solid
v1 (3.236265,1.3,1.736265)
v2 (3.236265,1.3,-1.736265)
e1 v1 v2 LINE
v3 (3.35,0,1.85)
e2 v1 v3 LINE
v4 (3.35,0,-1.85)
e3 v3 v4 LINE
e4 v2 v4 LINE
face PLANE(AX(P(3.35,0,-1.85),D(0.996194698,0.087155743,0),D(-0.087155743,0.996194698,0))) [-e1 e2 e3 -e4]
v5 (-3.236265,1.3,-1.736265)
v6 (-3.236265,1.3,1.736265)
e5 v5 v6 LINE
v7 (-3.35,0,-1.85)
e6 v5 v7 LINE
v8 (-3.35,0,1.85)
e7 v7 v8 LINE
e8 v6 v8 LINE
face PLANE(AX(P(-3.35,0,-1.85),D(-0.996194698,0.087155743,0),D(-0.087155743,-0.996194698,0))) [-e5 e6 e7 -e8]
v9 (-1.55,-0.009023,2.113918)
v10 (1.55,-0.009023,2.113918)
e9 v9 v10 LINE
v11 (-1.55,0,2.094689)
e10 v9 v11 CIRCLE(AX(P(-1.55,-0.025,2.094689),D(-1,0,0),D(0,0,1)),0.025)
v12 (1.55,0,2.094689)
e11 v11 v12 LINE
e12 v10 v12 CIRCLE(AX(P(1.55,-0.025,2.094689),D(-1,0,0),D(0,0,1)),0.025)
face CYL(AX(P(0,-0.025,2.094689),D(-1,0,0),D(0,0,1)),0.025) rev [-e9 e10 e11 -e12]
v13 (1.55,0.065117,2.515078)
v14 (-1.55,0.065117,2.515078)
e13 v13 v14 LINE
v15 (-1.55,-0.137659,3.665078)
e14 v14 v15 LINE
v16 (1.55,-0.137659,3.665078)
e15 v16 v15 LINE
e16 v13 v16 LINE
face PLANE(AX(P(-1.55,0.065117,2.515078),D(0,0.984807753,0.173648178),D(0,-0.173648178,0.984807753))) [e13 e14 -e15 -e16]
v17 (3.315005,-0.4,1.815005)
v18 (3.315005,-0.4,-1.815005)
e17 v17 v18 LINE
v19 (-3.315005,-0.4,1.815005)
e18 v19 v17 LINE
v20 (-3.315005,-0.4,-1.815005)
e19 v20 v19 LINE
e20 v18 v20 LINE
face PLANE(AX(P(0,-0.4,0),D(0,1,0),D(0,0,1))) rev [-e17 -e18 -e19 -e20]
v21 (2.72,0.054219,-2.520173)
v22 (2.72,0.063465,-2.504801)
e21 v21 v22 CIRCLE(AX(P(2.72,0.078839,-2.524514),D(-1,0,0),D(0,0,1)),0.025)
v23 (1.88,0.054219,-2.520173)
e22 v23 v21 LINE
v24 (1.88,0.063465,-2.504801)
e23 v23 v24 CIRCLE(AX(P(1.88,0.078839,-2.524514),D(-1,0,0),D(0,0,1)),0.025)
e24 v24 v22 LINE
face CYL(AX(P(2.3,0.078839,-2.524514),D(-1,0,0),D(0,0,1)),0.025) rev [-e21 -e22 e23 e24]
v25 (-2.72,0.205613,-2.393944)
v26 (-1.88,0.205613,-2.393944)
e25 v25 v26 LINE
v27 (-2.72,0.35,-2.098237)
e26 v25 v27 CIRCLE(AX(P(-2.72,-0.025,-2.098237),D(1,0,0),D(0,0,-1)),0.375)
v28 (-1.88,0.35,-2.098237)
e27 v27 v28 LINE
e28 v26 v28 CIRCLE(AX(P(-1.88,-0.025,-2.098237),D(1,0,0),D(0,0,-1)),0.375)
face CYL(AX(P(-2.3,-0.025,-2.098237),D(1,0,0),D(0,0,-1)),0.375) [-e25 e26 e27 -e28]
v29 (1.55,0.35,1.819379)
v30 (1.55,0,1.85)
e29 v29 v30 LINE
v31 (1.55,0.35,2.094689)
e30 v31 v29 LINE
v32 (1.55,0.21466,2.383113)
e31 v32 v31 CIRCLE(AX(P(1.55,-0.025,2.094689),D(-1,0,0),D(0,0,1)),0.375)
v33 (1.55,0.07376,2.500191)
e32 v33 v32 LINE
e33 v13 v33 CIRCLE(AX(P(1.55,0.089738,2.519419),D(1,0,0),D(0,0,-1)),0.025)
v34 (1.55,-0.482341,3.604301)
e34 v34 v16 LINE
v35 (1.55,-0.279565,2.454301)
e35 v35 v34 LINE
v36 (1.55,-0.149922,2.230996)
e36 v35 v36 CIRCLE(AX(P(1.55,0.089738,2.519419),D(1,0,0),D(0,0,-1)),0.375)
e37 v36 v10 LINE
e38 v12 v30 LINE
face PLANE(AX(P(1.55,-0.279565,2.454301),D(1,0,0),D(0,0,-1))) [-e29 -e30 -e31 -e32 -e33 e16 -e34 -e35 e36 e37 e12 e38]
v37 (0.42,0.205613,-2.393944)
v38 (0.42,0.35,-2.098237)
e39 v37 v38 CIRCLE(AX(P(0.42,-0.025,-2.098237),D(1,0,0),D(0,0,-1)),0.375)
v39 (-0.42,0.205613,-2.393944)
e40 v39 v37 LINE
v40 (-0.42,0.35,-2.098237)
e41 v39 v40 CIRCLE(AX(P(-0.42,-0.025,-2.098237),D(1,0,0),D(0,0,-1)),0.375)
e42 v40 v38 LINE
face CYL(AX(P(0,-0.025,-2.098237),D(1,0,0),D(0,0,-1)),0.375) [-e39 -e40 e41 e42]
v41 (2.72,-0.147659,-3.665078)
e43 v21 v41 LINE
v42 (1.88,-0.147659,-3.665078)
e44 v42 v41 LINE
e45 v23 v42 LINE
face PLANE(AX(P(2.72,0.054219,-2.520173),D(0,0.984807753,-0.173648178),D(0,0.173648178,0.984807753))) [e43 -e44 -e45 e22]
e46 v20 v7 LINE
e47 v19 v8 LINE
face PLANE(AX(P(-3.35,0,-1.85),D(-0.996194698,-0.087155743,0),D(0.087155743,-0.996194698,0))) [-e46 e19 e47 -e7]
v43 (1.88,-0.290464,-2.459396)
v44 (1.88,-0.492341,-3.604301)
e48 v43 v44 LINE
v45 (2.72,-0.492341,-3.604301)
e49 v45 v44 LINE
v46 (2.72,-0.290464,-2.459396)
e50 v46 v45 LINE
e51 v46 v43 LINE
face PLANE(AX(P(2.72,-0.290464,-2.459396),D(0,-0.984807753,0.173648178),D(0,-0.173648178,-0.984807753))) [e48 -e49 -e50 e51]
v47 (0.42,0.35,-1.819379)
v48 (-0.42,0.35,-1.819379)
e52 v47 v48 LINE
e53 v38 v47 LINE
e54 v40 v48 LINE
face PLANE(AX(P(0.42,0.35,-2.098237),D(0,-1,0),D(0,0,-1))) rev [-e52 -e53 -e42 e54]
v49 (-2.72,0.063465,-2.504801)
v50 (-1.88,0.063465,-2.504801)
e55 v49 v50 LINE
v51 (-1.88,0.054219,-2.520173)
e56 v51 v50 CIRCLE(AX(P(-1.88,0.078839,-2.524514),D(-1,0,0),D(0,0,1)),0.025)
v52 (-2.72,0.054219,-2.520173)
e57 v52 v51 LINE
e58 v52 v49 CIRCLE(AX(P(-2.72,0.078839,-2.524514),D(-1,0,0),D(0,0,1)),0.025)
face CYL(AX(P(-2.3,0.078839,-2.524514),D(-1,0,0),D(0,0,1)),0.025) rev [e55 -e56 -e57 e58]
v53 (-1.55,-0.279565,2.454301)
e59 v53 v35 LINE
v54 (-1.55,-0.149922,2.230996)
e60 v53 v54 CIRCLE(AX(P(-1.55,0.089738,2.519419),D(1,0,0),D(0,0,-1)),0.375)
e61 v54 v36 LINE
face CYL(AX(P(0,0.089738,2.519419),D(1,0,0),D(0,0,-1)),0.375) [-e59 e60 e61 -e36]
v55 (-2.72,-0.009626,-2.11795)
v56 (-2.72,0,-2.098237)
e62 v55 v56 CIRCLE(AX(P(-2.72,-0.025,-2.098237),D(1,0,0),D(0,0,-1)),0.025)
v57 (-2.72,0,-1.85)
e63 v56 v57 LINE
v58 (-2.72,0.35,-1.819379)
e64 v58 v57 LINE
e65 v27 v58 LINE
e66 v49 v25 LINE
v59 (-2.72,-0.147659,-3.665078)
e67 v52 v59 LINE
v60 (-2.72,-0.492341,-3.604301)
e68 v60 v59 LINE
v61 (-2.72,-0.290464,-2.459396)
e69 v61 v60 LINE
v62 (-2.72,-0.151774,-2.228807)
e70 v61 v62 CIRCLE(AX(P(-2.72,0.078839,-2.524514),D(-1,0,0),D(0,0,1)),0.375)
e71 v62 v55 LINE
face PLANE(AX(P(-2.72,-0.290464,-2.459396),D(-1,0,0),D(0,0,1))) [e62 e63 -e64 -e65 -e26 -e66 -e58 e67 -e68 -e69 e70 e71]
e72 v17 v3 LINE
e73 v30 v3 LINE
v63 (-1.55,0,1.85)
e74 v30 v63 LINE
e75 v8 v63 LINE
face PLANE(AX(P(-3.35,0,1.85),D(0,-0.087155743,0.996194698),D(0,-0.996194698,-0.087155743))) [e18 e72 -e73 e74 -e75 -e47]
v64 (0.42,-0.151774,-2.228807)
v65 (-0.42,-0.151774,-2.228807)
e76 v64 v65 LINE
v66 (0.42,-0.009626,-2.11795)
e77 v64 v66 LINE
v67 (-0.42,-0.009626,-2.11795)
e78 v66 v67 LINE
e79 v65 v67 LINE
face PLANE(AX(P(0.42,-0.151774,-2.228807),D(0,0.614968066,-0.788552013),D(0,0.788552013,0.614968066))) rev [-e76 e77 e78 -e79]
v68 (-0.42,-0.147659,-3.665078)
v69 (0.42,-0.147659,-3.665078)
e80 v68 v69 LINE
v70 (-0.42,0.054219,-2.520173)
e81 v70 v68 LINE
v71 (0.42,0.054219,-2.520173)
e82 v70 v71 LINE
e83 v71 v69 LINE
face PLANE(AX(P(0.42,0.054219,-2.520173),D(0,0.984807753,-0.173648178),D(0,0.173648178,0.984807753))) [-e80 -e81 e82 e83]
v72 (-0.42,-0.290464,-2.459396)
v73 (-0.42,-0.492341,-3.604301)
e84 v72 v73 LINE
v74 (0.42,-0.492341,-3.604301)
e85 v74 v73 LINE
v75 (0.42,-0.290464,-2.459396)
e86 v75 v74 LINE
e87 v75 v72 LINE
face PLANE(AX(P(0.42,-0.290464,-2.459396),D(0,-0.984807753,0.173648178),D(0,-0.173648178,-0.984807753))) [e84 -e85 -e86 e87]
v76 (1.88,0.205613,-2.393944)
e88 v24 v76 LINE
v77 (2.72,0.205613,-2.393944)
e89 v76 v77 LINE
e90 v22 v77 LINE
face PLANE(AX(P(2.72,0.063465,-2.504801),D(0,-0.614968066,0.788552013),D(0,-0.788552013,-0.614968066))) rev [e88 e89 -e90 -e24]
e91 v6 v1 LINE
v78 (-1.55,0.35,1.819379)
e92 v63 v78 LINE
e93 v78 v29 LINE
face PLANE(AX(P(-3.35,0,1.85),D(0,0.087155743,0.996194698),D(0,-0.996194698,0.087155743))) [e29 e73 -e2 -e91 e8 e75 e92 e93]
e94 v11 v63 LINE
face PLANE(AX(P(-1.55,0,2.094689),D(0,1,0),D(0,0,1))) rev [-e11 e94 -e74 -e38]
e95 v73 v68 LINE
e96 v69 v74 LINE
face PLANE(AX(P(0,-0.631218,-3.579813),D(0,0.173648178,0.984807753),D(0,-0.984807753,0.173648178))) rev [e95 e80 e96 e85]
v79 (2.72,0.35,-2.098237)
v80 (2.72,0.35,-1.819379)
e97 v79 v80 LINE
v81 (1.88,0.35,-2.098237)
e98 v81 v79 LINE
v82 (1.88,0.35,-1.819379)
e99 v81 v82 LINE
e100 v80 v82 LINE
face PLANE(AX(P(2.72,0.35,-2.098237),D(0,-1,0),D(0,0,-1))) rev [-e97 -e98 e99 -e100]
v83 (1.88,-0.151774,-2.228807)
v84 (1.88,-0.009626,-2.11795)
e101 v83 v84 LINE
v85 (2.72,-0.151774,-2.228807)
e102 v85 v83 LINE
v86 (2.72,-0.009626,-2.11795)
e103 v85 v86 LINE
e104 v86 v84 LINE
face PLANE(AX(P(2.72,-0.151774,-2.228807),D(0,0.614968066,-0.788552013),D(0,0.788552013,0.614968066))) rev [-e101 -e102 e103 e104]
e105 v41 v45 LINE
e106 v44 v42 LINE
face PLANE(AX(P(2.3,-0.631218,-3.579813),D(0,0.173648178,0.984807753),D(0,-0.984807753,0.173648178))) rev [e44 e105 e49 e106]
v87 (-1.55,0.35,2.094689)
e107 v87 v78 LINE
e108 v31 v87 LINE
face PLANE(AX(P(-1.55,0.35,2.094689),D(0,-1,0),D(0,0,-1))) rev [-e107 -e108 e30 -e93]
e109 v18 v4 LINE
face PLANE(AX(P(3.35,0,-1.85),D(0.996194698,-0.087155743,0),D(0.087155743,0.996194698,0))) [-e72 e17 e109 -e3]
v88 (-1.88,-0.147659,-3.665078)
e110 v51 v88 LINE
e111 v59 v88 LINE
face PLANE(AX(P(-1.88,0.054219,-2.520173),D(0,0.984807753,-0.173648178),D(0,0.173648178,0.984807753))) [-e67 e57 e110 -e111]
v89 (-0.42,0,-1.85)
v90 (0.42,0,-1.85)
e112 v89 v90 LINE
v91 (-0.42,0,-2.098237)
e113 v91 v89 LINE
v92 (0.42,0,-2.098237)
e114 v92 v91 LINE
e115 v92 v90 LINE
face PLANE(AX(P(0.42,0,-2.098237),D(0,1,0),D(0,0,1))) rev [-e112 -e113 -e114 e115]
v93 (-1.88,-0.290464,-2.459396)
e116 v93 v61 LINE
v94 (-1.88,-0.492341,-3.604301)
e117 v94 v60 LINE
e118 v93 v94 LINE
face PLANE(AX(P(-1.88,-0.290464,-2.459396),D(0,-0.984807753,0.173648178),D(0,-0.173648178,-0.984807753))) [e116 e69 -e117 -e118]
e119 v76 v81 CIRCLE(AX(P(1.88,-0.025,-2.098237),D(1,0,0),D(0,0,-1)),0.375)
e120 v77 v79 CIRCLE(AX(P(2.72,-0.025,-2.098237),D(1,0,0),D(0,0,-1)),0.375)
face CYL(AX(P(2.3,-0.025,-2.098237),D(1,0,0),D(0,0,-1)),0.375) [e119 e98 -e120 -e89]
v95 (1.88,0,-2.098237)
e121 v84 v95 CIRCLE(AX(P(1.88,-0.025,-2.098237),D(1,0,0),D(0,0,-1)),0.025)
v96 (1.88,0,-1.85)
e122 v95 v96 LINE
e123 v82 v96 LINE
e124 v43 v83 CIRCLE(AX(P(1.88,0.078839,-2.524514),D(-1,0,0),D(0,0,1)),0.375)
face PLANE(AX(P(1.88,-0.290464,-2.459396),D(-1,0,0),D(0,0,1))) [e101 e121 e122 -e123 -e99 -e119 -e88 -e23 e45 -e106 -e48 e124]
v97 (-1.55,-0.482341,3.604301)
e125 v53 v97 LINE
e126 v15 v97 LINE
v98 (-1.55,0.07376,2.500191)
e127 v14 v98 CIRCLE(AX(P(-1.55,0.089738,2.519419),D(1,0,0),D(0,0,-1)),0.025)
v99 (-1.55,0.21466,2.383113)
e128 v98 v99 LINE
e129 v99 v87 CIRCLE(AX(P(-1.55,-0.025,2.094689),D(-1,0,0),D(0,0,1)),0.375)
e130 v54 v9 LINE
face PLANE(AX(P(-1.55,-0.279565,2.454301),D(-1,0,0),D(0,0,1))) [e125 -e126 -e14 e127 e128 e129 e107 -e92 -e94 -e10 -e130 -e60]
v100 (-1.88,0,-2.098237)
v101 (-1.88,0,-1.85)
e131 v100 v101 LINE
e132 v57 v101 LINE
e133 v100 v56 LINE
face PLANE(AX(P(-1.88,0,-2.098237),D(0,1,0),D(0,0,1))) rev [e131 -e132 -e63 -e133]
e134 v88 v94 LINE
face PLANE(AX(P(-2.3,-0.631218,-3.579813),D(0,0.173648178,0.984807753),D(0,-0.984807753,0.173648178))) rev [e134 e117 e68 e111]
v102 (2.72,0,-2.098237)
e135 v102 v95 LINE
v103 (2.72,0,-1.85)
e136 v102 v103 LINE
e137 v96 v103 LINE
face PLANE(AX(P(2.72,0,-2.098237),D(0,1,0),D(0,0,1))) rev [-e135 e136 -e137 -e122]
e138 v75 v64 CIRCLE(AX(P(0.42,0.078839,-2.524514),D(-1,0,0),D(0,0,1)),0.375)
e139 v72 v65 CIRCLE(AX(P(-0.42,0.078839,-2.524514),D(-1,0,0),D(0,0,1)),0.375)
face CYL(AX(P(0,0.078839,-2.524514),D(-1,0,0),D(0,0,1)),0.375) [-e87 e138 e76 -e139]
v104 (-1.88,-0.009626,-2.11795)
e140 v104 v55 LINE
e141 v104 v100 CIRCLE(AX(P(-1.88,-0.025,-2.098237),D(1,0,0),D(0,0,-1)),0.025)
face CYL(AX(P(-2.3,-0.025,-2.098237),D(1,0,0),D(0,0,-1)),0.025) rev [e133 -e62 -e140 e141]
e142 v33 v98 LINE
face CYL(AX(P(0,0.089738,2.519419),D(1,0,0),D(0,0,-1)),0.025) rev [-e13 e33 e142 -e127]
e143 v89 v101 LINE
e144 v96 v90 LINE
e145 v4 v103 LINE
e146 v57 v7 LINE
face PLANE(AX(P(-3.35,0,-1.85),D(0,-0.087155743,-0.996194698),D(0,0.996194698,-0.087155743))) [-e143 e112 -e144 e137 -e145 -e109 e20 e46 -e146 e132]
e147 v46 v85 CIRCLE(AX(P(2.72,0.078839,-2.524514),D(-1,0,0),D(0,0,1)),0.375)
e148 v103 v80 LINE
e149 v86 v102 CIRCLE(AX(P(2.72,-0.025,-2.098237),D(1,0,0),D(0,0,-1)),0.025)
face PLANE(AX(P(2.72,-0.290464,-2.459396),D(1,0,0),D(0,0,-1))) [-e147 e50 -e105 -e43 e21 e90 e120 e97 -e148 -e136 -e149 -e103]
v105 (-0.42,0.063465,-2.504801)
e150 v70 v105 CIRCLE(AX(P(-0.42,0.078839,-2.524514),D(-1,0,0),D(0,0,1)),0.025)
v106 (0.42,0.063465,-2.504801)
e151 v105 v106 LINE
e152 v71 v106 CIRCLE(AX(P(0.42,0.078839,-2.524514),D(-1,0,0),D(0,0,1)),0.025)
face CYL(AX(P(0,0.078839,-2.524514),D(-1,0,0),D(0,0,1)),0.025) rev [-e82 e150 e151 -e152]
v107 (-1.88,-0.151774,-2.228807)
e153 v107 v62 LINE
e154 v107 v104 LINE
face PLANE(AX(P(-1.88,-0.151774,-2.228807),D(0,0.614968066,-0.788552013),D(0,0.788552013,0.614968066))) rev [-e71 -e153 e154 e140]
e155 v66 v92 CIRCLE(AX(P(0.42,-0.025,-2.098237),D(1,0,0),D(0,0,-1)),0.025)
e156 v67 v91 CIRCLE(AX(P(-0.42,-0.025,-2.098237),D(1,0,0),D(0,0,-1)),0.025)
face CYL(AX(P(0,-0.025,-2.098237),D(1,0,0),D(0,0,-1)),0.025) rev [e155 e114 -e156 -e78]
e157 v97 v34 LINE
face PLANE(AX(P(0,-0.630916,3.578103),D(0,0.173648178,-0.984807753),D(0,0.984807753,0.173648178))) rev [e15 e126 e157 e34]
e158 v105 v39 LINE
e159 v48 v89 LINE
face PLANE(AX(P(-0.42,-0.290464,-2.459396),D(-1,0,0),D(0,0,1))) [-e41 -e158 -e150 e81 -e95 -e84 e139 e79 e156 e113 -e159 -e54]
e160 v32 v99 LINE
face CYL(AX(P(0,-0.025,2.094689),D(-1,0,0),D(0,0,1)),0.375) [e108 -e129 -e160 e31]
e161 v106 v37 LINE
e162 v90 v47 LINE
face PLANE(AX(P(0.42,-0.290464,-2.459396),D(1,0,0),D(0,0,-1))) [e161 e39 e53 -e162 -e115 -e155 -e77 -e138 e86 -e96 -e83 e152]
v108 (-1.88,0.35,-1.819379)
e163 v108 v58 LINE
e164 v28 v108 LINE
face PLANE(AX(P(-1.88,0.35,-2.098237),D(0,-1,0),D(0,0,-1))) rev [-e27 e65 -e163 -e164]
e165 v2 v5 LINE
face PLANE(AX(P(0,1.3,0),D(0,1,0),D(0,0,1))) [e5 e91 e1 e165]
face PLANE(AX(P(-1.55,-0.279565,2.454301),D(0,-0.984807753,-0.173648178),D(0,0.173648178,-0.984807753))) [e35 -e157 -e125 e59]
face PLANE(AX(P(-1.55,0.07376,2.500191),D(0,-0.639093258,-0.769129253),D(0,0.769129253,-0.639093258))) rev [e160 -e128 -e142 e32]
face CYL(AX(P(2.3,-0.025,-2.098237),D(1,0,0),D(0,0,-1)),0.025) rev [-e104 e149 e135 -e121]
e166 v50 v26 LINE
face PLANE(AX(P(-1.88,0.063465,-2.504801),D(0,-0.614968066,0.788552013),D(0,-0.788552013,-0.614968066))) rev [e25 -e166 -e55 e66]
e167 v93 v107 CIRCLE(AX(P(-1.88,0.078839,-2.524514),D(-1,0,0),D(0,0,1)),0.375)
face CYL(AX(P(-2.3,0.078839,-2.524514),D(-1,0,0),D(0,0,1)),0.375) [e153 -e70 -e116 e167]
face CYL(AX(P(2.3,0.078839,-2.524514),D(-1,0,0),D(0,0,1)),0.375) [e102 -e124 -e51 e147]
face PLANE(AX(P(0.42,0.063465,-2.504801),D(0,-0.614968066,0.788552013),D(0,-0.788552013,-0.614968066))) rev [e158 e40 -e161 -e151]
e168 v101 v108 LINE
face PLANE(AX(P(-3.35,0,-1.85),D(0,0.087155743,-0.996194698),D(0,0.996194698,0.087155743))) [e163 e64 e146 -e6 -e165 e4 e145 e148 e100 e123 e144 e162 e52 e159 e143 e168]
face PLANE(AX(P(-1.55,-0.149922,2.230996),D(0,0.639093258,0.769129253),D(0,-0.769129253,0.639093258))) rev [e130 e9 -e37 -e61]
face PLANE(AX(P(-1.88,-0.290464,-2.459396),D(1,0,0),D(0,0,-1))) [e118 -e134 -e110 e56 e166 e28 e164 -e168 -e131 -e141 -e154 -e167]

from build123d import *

# Parameters (mm, degrees)
CROQUIS1_W              = 6.7
CROQUIS1_H              = 3.7
SALIENTE_EXTRUIR1_DEPTH = 1.3
SALIENTE_EXTRUIR1_TAPER = 5
CROQUIS1_2_W            = 6.7
CROQUIS1_2_H            = 3.7
SALIENTE_EXTRUIR2_DEPTH = 0.4
SALIENTE_EXTRUIR2_DRAFT = -5
BARRER1_START           = -0.42
BARRER1_DEPTH           = 0.84
MATRIZL1_COUNT          = 2
MATRIZL1_PITCH          = 2.3
MATRIZL2_COUNT          = 2
MATRIZL2_PITCH          = 2.3
BARRER2_START           = -1.55
BARRER2_DEPTH           = 3.1


# Read off the part's stored shape, not the designer's step: Barrer1, Barrer2
with BuildPart() as part:
    # Croquis1 → Saliente-Extruir1 (new body)
    with BuildSketch(Plane(origin=(0, 0, 0), x_dir=(1, 0, 0), z_dir=(0, 1, 0))):
        Rectangle(CROQUIS1_W, CROQUIS1_H)
    extrude(amount=SALIENTE_EXTRUIR1_DEPTH, taper=SALIENTE_EXTRUIR1_TAPER)


with BuildPart() as saliente_extruir2_tool:
    # Croquis1<2> → Saliente-Extruir2 (with draft: the straight prism first)
    with BuildSketch(Plane(origin=(0, 0, 0), x_dir=(1, 0, 0), z_dir=(0, 1, 0))):
        Rectangle(CROQUIS1_2_W, CROQUIS1_2_H)
    extrude(amount=-SALIENTE_EXTRUIR2_DEPTH)
    # Saliente-Extruir2: the draft: its side faces are tilted about the plane it starts from
    saliente_extruir2_sides = [saliente_extruir2_tool.faces().sort_by_distance(p)[0] for p in [
        (-3.35, -0.2, 0),
        (0, -0.2, 1.85),
        (3.35, -0.2, 0),
        (0, -0.2, -1.85),
    ]]
    draft(saliente_extruir2_sides, Plane(origin=(0, 0, 0), x_dir=(1, 0, 0), z_dir=(0, 1, 0)), SALIENTE_EXTRUIR2_DRAFT)


with BuildPart() as part_1:
    add(part.part)

    # Saliente-Extruir2: add saliente_extruir2_tool
    add(saliente_extruir2_tool.part)

    # Barrer1 outline → Barrer1 (add)
    with BuildSketch(Plane.YZ.offset(BARRER1_START)):
        with BuildLine():
            Line((0.35, -2.098236587), (0.35, -1.819378968))
            Line((0.35, -1.819378968), (0, -1.85))
            Line((0, -1.85), (0, -2.098236587))
            ThreePointArc((0, -2.098236587), (-0.002534971, -2.109205747), (-0.009625798, -2.117950387))
            Line((-0.009625798, -2.117950387), (-0.151773886, -2.228807417))
            ThreePointArc((-0.151773886, -2.228807417), (-0.24251362, -2.331233787), (-0.290463768, -2.459396356))
            Line((-0.290463768, -2.459396356), (-0.492341357, -3.604301053))
            Line((-0.492341357, -3.604301053), (-0.147658643, -3.665077915))
            Line((-0.147658643, -3.665077915), (0.054218945, -2.520173218))
            ThreePointArc((0.054218945, -2.520173218), (0.057415622, -2.511629047), (0.063464937, -2.504800622))
            Line((0.063464937, -2.504800622), (0.205613025, -2.393943592))
            ThreePointArc((0.205613025, -2.393943592), (0.311975433, -2.262773993), (0.35, -2.098236587))
        make_face()
    barrer1 = extrude(amount=BARRER1_DEPTH)

    # MatrizL1: Barrer1 ×2
    with Locations(*[(-i * MATRIZL1_PITCH, 0, 0) for i in range(1, MATRIZL1_COUNT)]):
        add(barrer1)

    # MatrizL2: Barrer1 ×2
    with Locations(*[(i * MATRIZL2_PITCH, 0, 0) for i in range(1, MATRIZL2_COUNT)]):
        add(barrer1)

    # Barrer2 outline → Barrer2 (add)
    with BuildSketch(Plane.YZ.offset(BARRER2_START)):
        with BuildLine():
            Line((0.35, 1.819378968), (0.35, 2.094689484))
            ThreePointArc((0.35, 2.094689484), (0.314483055, 2.253988747), (0.214659972, 2.383112954))
            Line((0.214659972, 2.383112954), (0.073760247, 2.500190888))
            ThreePointArc((0.073760247, 2.500190888), (0.068117087, 2.506867054), (0.065117385, 2.515077915))
            Line((0.065117385, 2.515077915), (-0.137658643, 3.665077915))
            Line((-0.137658643, 3.665077915), (-0.482341357, 3.604301053))
            Line((-0.482341357, 3.604301053), (-0.279565329, 2.454301053))
            ThreePointArc((-0.279565329, 2.454301053), (-0.234569796, 2.33113814), (-0.149922393, 2.23099565))
            Line((-0.149922393, 2.23099565), (-0.009022669, 2.113917715))
            ThreePointArc((-0.009022669, 2.113917715), (-0.002367796, 2.105309435), (0, 2.094689484))
            Line((0, 2.094689484), (0, 1.85))
            Line((0, 1.85), (0.35, 1.819378968))
        make_face()
    extrude(amount=BARRER2_DEPTH)


solid = part_1.part
